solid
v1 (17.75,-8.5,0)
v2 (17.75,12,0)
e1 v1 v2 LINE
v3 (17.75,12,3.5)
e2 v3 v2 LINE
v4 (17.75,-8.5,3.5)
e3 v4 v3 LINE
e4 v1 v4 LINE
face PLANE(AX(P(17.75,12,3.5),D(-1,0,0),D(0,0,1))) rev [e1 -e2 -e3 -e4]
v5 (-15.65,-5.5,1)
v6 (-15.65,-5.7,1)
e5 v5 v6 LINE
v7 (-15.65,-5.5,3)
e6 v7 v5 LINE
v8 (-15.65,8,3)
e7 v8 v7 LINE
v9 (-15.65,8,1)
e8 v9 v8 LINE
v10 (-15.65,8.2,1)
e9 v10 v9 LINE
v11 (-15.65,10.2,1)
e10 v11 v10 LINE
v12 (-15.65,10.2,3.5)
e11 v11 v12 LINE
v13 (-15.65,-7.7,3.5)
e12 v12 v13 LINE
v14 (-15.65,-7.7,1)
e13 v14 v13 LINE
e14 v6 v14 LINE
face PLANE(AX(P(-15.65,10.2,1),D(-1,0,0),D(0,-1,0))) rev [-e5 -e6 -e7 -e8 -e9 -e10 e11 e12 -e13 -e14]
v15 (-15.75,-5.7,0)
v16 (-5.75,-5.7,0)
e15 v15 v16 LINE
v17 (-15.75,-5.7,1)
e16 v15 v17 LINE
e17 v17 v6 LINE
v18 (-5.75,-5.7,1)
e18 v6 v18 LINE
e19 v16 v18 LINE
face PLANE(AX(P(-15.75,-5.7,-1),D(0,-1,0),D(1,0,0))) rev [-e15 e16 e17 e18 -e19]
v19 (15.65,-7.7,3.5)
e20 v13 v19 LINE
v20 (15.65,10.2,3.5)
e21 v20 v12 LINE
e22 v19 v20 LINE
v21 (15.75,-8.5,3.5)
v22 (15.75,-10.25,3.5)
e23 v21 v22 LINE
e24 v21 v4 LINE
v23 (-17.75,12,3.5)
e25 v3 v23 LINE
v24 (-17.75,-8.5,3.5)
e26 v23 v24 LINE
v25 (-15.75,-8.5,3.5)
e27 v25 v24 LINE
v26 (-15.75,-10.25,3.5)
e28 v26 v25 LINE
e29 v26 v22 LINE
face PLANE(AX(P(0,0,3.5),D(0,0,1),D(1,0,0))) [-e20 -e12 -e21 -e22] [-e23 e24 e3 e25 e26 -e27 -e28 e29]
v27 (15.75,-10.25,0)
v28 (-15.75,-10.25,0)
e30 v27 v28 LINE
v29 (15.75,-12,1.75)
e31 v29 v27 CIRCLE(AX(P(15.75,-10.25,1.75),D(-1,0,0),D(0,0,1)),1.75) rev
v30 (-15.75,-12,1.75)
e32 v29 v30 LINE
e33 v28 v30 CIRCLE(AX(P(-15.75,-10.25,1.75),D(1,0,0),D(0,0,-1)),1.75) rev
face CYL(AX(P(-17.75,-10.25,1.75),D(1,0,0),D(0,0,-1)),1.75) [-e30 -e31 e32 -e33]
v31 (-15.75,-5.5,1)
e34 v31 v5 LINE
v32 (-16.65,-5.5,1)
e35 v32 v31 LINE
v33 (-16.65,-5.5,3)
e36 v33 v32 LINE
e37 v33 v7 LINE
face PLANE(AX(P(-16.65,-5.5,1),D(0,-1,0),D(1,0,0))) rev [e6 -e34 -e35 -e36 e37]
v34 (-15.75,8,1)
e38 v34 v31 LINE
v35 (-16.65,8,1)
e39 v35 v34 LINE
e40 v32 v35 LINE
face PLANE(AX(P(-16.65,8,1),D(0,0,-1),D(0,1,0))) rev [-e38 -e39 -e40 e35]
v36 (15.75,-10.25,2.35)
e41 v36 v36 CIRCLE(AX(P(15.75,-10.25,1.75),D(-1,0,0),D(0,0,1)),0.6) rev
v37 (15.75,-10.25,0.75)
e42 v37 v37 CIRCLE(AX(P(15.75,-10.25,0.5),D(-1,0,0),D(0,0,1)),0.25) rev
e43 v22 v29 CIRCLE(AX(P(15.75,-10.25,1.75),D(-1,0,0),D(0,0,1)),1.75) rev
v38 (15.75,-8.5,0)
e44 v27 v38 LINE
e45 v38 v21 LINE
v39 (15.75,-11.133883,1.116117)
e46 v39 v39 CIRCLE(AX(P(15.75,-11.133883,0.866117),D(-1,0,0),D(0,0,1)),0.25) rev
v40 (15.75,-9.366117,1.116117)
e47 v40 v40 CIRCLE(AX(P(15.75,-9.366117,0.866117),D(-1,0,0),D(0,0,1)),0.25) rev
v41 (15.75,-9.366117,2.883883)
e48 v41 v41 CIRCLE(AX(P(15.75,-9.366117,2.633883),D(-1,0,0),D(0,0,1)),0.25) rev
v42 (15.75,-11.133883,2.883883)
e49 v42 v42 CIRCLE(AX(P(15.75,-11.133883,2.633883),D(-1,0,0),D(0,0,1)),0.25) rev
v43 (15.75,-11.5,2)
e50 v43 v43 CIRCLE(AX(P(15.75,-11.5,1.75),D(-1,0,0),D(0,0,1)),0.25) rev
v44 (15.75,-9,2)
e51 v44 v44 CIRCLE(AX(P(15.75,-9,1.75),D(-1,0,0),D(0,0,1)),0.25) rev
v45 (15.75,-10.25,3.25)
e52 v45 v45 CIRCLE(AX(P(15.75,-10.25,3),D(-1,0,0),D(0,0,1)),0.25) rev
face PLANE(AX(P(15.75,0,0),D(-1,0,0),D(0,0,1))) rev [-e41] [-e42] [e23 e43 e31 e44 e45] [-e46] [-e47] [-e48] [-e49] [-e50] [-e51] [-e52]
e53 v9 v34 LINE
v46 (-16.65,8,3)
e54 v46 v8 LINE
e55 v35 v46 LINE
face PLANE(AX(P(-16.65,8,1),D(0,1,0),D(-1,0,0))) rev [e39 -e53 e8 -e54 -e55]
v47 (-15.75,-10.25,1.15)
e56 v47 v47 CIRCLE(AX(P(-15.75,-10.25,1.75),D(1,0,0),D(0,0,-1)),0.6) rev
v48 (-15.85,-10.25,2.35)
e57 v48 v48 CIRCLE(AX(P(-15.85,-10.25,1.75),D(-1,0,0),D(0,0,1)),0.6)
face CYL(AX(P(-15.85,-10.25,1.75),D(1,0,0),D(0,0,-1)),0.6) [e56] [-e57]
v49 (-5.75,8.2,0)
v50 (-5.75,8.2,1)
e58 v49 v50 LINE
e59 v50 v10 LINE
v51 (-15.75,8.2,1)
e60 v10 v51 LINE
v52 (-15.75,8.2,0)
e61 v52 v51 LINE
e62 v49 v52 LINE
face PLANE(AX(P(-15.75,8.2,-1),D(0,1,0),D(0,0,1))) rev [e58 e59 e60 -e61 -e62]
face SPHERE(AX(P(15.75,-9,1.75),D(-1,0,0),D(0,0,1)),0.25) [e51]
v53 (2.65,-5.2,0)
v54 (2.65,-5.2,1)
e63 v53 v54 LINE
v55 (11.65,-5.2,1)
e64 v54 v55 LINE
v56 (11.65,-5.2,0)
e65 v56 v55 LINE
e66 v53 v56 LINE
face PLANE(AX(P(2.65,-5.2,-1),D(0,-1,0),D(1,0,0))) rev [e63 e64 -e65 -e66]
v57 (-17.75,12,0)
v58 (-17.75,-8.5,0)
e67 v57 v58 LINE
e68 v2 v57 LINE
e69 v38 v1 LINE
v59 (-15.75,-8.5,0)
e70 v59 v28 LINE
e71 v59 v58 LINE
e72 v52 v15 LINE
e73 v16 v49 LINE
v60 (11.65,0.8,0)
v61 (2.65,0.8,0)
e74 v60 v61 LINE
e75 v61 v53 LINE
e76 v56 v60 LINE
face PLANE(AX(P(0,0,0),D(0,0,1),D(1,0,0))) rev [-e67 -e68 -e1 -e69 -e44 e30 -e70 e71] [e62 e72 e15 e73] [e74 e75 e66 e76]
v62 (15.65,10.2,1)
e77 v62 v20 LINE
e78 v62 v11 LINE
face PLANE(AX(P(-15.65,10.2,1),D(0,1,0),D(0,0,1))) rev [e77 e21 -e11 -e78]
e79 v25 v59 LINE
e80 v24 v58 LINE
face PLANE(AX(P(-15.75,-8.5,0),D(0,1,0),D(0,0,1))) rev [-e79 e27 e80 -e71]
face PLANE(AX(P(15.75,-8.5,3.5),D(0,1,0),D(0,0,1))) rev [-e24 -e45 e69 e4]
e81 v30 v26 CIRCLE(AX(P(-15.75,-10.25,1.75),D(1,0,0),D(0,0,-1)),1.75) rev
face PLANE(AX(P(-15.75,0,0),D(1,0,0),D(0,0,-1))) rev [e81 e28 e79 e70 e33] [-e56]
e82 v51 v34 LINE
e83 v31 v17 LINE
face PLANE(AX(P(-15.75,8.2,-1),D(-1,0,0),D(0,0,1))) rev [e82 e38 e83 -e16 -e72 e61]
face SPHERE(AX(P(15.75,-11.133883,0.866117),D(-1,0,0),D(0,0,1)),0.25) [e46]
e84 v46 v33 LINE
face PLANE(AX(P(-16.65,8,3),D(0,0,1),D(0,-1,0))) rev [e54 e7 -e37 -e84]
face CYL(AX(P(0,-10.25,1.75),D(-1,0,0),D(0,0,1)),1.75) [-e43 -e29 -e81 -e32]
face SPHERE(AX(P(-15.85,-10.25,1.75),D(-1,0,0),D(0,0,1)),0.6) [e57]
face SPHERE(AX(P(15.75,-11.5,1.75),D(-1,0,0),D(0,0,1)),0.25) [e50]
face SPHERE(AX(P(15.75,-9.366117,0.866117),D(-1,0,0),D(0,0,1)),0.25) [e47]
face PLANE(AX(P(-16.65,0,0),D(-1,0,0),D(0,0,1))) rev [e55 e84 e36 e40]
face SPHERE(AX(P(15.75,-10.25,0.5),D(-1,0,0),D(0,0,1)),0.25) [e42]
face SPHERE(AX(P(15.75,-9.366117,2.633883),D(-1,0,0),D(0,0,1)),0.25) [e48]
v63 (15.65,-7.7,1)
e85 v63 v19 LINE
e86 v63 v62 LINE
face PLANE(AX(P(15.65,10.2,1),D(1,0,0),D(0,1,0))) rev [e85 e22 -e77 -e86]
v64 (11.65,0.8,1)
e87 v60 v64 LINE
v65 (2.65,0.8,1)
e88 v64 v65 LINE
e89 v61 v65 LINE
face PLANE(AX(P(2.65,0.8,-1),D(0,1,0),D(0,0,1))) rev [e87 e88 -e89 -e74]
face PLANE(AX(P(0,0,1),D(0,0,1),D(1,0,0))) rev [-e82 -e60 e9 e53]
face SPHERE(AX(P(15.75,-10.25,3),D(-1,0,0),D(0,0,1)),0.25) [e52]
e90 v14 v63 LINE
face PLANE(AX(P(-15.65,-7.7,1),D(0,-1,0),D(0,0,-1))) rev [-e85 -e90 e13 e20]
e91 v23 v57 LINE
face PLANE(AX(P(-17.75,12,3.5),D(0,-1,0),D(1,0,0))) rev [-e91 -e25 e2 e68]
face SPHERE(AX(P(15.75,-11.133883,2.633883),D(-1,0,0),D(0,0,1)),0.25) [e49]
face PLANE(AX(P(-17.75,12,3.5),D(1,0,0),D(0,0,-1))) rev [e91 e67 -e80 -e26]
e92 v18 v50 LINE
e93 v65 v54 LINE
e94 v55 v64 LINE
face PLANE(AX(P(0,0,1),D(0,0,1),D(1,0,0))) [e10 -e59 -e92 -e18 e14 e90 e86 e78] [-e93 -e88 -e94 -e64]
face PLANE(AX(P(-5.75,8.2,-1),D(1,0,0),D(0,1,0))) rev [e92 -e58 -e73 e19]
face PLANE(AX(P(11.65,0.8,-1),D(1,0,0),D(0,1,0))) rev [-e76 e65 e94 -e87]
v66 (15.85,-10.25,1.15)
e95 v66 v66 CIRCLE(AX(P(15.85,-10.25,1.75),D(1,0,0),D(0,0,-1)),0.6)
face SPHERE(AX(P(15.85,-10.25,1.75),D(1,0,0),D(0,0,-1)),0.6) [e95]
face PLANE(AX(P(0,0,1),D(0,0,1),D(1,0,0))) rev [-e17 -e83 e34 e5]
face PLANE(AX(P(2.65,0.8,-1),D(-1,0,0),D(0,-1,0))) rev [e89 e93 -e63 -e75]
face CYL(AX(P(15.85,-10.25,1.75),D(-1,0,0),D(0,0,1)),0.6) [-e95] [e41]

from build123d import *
from build123d.topology import SkipClean

# Parameters (mm, degrees)
SKETCH_1_W               = 35.5
SKETCH_1_H               = 24
EXTRUDE_1_DEPTH          = 3.5
SKETCH_2_W               = 31.3
SKETCH_2_H               = 17.9
CUT_EXTRUDE_1_DEPTH      = 2.5
SKETCH_12_W              = 3.5
SKETCH_12_H              = 3.5
CUT_EXTRUDE_9_DEPTH      = 2
SKETCH_13_W              = 3.5
SKETCH_13_H              = 3.5
CUT_EXTRUDE_10_DEPTH     = 2
SKETCH_14_W              = 10
SKETCH_14_H              = 13.9
CUT_EXTRUDE_11_DEPTH     = 2
SKETCH_18_W              = 2
SKETCH_18_H              = 13.5
CUT_EXTRUDE_12_DEPTH     = 1
SKETCH_19_W              = 9
SKETCH_19_H              = 6
CUT_EXTRUDE_13_DEPTH     = 2
SKETCH_20_R              = 0.6
EXTRUDE_3_DEPTH          = 0.1
EXTRUDE_START            = 0.1
SKETCH_21_R              = 0.6
EXTRUDE_4_DEPTH          = 0.1
FILLET_1_R               = 1.75
FILLET_2_R               = 1.75
PATTERN_CIRCULAR_2_COUNT = 8


with BuildPart() as part:
    # 草图1 → 凸台-拉伸1 (new body)
    with BuildSketch(Plane.XY):
        Rectangle(SKETCH_1_W, SKETCH_1_H)
    extrude(amount=EXTRUDE_1_DEPTH)

    # 草图2 → 切除-拉伸1 (cut)
    with BuildSketch(Plane.XY.offset(3.5)):
        with Locations((0, 1.25)):
            Rectangle(SKETCH_2_W, SKETCH_2_H)
    extrude(amount=-CUT_EXTRUDE_1_DEPTH, mode=Mode.SUBTRACT)

    # 草图12 → 切除-拉伸9 (cut)
    with BuildSketch(Plane.ZY.offset(17.75)):
        with Locations((1.75, -10.25)):
            Rectangle(SKETCH_12_W, SKETCH_12_H)
    extrude(amount=-CUT_EXTRUDE_9_DEPTH, mode=Mode.SUBTRACT)

    # 草图13 → 切除-拉伸10 (cut)
    with BuildSketch(Plane(origin=(17.75, 0, 0), x_dir=(0, 0, -1), z_dir=(1, 0, 0))):
        with Locations((-1.75, -10.25)):
            Rectangle(SKETCH_13_W, SKETCH_13_H)
    extrude(amount=-CUT_EXTRUDE_10_DEPTH, mode=Mode.SUBTRACT)

    # 草图14 → 切除-拉伸11 (cut)
    with BuildSketch(Plane.XY.offset(1)):
        with Locations((-10.75, 1.25)):
            Rectangle(SKETCH_14_W, SKETCH_14_H)
    extrude(amount=-CUT_EXTRUDE_11_DEPTH, mode=Mode.SUBTRACT)

    # 草图18 → 切除-拉伸12 (cut)
    with BuildSketch(Plane(origin=(-15.65, 0, 0), x_dir=(0, 0, -1), z_dir=(1, 0, 0))):
        with Locations((-2, 1.25)):
            Rectangle(SKETCH_18_W, SKETCH_18_H)
    extrude(amount=-CUT_EXTRUDE_12_DEPTH, mode=Mode.SUBTRACT)

    # 草图19 → 切除-拉伸13 (cut)
    with BuildSketch(Plane.XY.offset(1)):
        with Locations((7.15, -2.2)):
            Rectangle(SKETCH_19_W, SKETCH_19_H)
    extrude(amount=-CUT_EXTRUDE_13_DEPTH, mode=Mode.SUBTRACT)

    # 草图20 → 凸台-拉伸3 (add)
    with BuildSketch(Plane.ZY.offset(15.75)):
        with Locations(Location((1.75, -10.25, 0), (0, 0, 180))):
            Circle(SKETCH_20_R)
    extrude(amount=EXTRUDE_3_DEPTH)

    # 草图21 → 凸台-拉伸4 (add)
    with BuildSketch(Plane(origin=(15.75, 0, 0), x_dir=(0, 0, -1), z_dir=(1, 0, 0)).offset(EXTRUDE_START)):
        with Locations((-1.75, -10.25)):
            Circle(SKETCH_21_R)
    extrude(amount=-EXTRUDE_4_DEPTH)

    # 草图23 → 旋转1 (revolve)
    with BuildSketch(Plane.ZY.offset(15.85)):
        with BuildLine():
            Line((1.75, -9.65), (1.75, -10.85))
            ThreePointArc((1.75, -10.85), (2.35, -10.25), (1.75, -9.65))
        make_face()
    revolve(axis=Axis((-15.85, -9.65, 1.75), (0, -1, 0)))

    # 草图24 → 旋转2 (revolve)
    with SkipClean():  # the faces are left unmerged after this step: merging them gives an invalid solid
        with BuildSketch(Plane(origin=(15.85, 0, 0), x_dir=(0, 0, -1), z_dir=(1, 0, 0))):
            with BuildLine():
                ThreePointArc((-2.140499307, -9.794467025), (-2.205532975, -10.640499307), (-1.359500693, -10.705532975))
                Line((-1.359500693, -10.705532975), (-2.140499307, -9.794467025))
            make_face()
            with BuildLine():
                Line((-2.140499307, -9.794467025), (-1.359500693, -10.705532975))
                ThreePointArc((-1.359500693, -10.705532975), (-1.204885524, -10.500699438), (-1.15, -10.25))
                ThreePointArc((-1.15, -10.25), (-1.499300562, -9.704885524), (-2.140499307, -9.794467025))
            make_face()
        revolve(axis=Axis((15.85, -10.705532975, 1.359500693), (0, 0.7592216255630779, 0.65083217750612)))
    add(part.part.scale(1), mode=Mode.REPLACE)  # the faces are merged on a copy

    # 圆角1
    fillet_1_edges = [part.edges().sort_by_distance(p)[0] for p in [
        (0, -12, 3.5),
    ]]
    fillet(fillet_1_edges, radius=FILLET_1_R)

    # 圆角2
    fillet_2_edges = [part.edges().sort_by_distance(p)[0] for p in [
        (0, -12, 0),
    ]]
    fillet(fillet_2_edges, radius=FILLET_2_R - 0.0001)  # a hair under: the kernel refuses the full size

    # 草图25 → 旋转3 (revolve)
    with BuildSketch(Plane(origin=(15.75, 0, 0), x_dir=(0, 0, -1), z_dir=(1, 0, 0))):
        with BuildLine():
            Line((-2, -9), (-1.5, -9))
            ThreePointArc((-1.5, -9), (-1.75, -8.75), (-2, -9))
        make_face()
    revolve_3 = revolve(axis=Axis((15.75, -9, 2), (0, 0, -1)))

    # 阵列(圆周)2: 旋转3 ×8 about axis
    pattern_circular_2_axis = Axis((0, -10.25, 1.75), (1, 0, 0))
    for i in range(1, PATTERN_CIRCULAR_2_COUNT):
        add(revolve_3.rotate(pattern_circular_2_axis, i * 360 / PATTERN_CIRCULAR_2_COUNT))


solid = part.part
